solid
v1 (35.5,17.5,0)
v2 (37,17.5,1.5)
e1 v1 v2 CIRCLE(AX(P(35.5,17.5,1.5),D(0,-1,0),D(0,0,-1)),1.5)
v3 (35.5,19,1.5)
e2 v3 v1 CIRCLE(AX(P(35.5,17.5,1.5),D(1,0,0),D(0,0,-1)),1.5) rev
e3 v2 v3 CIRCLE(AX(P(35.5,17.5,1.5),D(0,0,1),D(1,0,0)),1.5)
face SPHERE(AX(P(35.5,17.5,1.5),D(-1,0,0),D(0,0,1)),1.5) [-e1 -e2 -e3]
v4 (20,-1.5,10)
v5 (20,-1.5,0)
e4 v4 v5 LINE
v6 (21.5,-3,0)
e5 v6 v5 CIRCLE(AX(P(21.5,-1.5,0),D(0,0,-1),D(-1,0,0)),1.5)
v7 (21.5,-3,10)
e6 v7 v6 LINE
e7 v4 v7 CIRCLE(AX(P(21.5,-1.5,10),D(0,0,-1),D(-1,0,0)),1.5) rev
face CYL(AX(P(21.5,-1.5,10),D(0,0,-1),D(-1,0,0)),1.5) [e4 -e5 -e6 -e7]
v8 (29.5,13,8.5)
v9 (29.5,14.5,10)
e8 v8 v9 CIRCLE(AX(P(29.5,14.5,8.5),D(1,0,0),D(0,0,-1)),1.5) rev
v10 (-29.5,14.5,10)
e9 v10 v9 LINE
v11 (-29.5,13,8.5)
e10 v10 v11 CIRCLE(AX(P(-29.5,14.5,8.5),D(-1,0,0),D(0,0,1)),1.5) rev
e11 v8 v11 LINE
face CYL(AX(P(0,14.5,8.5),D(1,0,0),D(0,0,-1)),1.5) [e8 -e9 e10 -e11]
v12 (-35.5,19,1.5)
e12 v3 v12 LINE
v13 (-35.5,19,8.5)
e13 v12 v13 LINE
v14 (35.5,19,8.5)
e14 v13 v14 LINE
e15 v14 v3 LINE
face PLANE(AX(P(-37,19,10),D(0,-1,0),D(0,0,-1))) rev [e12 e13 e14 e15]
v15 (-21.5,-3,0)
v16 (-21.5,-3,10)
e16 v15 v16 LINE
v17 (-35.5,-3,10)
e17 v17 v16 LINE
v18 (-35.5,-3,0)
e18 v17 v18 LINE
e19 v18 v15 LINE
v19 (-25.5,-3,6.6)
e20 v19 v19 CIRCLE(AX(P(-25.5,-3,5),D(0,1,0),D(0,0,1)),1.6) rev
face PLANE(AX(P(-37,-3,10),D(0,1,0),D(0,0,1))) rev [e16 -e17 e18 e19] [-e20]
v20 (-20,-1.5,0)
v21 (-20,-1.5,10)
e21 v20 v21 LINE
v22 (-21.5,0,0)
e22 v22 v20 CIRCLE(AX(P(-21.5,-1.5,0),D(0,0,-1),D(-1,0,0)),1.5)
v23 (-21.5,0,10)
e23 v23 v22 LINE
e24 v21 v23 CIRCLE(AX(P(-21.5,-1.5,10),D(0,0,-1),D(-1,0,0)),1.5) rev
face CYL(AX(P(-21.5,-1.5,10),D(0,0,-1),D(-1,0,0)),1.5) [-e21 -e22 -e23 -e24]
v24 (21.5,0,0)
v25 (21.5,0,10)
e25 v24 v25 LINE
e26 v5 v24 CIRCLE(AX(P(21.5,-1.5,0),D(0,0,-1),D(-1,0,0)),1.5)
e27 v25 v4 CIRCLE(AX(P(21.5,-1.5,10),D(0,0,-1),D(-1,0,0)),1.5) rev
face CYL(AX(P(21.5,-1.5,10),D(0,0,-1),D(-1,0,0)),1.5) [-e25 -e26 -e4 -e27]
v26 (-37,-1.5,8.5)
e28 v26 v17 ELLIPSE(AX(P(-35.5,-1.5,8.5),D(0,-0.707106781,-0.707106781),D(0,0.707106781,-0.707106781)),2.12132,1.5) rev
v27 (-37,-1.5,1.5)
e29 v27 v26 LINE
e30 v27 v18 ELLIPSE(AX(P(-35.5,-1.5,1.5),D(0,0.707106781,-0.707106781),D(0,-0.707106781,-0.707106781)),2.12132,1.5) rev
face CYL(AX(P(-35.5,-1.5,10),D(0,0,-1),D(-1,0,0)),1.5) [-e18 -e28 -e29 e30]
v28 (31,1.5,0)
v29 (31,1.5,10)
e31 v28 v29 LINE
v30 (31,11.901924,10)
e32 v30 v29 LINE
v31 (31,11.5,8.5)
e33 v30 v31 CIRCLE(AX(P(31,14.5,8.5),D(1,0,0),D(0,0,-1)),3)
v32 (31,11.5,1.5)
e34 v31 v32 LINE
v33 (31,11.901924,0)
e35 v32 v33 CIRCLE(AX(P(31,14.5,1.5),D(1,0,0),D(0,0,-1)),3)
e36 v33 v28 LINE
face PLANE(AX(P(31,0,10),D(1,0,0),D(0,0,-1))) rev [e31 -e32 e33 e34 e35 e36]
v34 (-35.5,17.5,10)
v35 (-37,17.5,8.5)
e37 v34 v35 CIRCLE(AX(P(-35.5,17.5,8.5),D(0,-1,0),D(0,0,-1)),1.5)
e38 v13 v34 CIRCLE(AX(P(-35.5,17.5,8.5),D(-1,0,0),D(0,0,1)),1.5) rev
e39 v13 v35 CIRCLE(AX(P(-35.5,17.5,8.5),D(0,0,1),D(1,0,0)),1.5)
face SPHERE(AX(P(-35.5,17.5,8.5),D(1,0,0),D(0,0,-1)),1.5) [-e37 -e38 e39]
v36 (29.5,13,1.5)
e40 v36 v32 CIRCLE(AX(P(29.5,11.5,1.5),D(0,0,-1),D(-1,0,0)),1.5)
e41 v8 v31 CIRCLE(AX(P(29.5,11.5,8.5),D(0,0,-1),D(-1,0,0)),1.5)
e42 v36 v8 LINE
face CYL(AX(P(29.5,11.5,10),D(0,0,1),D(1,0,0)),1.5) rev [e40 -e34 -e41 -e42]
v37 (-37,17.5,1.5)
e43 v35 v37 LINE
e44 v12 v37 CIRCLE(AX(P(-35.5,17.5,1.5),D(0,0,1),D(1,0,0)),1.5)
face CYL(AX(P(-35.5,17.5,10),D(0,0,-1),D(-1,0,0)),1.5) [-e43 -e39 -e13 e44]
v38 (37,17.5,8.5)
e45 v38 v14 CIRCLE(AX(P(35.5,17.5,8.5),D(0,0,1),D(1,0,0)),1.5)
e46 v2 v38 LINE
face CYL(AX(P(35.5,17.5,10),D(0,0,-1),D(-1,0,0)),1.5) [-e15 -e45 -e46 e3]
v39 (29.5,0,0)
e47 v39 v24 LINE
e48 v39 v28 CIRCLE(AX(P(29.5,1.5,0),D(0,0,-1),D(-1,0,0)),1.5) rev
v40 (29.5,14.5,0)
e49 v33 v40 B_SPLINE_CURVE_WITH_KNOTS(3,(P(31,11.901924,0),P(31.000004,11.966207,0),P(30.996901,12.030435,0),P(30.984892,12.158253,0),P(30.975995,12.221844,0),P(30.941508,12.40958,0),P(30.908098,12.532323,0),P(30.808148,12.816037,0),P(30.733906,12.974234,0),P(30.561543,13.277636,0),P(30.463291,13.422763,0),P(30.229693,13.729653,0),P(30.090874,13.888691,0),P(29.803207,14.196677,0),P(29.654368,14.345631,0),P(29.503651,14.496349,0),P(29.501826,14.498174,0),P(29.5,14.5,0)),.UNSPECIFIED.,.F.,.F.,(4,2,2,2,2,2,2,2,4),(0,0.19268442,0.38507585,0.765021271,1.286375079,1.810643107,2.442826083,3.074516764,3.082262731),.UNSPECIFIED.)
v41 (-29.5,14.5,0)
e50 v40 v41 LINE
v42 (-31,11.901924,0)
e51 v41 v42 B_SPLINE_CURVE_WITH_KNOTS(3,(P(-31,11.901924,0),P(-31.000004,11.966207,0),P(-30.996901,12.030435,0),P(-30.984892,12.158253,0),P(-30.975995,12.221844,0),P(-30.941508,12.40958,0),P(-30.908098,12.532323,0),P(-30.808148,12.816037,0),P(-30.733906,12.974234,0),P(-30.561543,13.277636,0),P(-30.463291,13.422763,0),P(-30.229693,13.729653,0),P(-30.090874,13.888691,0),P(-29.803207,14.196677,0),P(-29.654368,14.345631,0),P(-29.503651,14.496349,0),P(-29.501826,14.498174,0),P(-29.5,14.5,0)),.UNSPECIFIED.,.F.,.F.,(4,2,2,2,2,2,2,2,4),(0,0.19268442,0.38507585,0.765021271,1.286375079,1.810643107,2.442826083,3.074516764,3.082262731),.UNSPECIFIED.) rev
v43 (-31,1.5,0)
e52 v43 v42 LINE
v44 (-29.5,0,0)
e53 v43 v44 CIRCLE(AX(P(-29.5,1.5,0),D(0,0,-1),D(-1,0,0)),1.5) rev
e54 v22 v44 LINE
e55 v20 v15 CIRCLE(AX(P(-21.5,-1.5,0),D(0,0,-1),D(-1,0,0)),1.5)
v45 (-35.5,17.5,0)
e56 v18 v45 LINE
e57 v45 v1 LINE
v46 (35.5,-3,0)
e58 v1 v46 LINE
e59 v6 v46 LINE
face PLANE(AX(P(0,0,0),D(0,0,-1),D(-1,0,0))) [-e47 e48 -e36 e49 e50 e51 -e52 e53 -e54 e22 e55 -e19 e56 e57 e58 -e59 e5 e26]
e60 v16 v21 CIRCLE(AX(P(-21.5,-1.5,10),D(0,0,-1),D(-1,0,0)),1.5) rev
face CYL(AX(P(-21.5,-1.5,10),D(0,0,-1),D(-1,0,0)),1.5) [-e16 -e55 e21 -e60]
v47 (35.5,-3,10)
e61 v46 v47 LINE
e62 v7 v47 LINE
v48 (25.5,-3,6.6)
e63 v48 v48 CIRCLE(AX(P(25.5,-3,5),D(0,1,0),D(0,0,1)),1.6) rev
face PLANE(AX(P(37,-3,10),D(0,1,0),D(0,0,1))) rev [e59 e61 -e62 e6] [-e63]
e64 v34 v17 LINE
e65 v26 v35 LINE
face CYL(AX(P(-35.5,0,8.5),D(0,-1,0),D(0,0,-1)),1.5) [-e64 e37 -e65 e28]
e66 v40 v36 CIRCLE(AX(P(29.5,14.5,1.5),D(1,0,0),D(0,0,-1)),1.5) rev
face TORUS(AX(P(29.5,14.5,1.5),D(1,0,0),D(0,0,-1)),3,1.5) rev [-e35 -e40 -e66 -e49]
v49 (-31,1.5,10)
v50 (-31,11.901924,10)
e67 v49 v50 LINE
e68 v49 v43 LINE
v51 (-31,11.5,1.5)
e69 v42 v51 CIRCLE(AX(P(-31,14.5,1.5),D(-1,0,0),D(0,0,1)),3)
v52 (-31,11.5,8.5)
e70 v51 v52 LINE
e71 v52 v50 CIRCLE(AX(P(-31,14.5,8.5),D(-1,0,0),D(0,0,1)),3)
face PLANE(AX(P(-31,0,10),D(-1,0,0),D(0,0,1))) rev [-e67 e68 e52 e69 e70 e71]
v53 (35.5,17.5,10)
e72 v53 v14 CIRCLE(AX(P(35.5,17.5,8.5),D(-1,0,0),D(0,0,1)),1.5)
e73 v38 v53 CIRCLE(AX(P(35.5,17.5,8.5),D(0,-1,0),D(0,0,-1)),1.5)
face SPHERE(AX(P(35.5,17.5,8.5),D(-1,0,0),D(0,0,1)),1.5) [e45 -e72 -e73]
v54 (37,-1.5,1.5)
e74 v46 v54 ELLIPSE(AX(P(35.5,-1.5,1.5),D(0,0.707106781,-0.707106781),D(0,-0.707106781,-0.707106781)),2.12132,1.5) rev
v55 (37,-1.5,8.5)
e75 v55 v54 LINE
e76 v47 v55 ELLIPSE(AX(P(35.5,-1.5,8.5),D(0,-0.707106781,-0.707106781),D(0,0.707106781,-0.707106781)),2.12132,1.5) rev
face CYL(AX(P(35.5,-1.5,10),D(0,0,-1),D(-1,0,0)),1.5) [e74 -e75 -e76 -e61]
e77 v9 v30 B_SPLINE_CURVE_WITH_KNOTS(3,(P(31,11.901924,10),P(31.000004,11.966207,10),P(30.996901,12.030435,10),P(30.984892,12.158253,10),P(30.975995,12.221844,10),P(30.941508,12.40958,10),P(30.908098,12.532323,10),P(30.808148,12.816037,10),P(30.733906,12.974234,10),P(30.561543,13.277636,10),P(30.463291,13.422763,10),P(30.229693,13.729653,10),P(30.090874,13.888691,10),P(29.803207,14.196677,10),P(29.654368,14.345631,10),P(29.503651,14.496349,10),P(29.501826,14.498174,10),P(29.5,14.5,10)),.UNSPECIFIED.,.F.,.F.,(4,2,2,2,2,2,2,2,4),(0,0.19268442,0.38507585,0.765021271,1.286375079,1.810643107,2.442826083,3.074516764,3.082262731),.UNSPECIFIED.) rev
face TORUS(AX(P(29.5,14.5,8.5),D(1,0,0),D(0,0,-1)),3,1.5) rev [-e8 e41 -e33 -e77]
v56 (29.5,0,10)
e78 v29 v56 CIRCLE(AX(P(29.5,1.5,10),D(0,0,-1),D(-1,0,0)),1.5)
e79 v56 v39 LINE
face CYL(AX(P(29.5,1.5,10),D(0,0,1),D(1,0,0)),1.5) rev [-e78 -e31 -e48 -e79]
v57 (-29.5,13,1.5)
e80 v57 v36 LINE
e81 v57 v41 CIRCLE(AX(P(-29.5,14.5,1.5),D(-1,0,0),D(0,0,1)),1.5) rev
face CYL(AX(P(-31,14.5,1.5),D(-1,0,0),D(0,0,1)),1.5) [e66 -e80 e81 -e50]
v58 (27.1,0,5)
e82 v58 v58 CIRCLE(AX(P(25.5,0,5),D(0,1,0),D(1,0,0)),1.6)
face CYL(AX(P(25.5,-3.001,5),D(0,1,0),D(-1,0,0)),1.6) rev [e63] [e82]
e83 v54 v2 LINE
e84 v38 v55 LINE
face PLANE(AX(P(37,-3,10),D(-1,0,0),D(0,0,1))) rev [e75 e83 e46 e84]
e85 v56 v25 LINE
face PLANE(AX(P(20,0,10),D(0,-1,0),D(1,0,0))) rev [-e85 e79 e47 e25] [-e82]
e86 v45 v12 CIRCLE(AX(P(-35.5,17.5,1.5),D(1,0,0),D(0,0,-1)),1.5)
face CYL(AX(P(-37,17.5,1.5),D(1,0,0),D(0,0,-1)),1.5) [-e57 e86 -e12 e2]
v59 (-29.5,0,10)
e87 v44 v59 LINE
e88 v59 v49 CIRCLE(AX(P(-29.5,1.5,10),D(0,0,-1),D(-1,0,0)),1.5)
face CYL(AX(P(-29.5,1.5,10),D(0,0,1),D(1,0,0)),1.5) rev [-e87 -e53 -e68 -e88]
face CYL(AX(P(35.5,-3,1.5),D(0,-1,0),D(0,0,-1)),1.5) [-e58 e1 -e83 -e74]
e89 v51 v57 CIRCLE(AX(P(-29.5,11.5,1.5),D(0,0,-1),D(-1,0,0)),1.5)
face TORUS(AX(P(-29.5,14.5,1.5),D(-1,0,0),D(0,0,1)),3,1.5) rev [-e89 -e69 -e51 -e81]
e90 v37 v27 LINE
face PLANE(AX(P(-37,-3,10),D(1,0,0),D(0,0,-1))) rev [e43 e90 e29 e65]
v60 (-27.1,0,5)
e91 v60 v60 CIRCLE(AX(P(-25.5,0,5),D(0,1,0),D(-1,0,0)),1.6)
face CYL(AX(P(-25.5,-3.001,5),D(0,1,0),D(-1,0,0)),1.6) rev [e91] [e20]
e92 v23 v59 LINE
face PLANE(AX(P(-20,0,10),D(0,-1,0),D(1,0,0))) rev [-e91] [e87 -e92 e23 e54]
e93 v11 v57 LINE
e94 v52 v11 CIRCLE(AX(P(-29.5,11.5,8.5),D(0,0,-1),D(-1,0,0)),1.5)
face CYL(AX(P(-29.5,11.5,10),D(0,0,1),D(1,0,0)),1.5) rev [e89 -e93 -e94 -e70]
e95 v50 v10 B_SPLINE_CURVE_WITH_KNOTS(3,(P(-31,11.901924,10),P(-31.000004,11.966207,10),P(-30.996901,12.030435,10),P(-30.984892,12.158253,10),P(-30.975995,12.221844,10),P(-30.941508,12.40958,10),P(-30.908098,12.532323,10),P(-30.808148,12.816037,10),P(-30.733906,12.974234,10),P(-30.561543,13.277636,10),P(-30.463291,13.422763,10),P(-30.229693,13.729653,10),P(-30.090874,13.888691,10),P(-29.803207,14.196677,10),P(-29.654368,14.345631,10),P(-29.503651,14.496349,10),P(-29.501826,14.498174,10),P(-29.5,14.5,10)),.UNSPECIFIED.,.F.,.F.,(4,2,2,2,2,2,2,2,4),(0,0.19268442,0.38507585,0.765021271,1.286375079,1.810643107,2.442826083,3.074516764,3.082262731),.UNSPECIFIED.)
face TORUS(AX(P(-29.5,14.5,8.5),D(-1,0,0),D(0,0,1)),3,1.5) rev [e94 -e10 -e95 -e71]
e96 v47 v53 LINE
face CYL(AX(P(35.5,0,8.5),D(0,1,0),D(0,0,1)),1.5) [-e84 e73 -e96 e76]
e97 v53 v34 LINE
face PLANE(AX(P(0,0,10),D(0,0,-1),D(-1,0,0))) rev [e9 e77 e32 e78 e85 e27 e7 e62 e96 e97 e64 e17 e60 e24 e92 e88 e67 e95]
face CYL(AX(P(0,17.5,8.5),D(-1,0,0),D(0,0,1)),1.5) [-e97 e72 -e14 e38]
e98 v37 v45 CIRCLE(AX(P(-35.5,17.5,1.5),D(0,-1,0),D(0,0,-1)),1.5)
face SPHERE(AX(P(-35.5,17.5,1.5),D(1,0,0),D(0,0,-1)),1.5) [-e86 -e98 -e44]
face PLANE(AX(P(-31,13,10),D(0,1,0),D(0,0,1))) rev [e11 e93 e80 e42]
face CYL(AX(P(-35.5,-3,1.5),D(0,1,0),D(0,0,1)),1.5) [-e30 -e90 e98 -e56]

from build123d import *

# Parameters (mm, degrees)
RESSALTO_EXTRUS_O1_DEPTH = 10
CORTE_EXTRUS_O1_REACH    = 44.778
ESBO_O2_R                = 1.6
FILETE1_R                = 1.5
FILETE2_R                = 1.5
FILETE3_R                = 1.5


# Some blends are built 0.0001 mm under size
with BuildPart() as part:
    # Esboço1 → Ressalto-extrusão1 (new body)
    with BuildSketch(Plane.XY):
        Polygon((-37, -3), (-20, -3), (-20, 0), (-31, 0), (-31, 13), (31, 13), (31, 0), (20, 0), (20, -3), (37, -3), (37, 19), (-37, 19), align=None)
    extrude(amount=RESSALTO_EXTRUS_O1_DEPTH)

    # Esboço2 → Corte-extrusão1 (cut, up to next)
    with BuildSketch(Plane(origin=(0, 0, 0), x_dir=(1, 0, 0), z_dir=(0, 1, 0)), mode=Mode.PRIVATE) as corte_extrus_o1_sk1:
        with Locations(Location((-25.5, -5, 0), (0, 0, 180))):
            Circle(ESBO_O2_R)
    corte_extrus_o1_tool1 = extrude(corte_extrus_o1_sk1.sketch, amount=-CORTE_EXTRUS_O1_REACH, mode=Mode.PRIVATE) & part.part
    # Esboço2 → Corte-extrusão1 (cut, up to next)
    with BuildSketch(Plane(origin=(0, 0, 0), x_dir=(1, 0, 0), z_dir=(0, 1, 0)), mode=Mode.PRIVATE) as corte_extrus_o1_sk2:
        with Locations(Location((25.5, -5, 0), (0, 0, 270))):
            Circle(ESBO_O2_R)
    corte_extrus_o1_tool2 = extrude(corte_extrus_o1_sk2.sketch, amount=-CORTE_EXTRUS_O1_REACH, mode=Mode.PRIVATE) & part.part
    add(corte_extrus_o1_tool1.solids().sort_by_distance((-25.5, 0, 5))[0], mode=Mode.SUBTRACT)
    add(corte_extrus_o1_tool2.solids().sort_by_distance((25.5, 0, 5))[0], mode=Mode.SUBTRACT)

    # Filete1
    filete1_edges = [part.edges().sort_by_distance(p)[0] for p in [
        (0, 19, 0),
        (0, 13, 0),
        (0, 13, 10),
        (0, 19, 10),
    ]]
    fillet(filete1_edges, radius=FILETE1_R)

    # Filete2
    filete2_edges = [part.edges().sort_by_distance(p)[0] for p in [
        (37, 7.25, 10),
        (37, 18.560660172, 9.560660172),
        (37, 7.25, 0),
        (37, 18.560660172, 0.439339828),
        (-37, 7.25, 10),
        (-37, 18.560660172, 9.560660172),
        (-37, 7.25, 0),
        (-37, 18.560660172, 0.439339828),
        (37, 19, 5),
        (-37, 19, 5),
        (-20, -3, 5),
        (20, -3, 5),
        (-20, 0, 5),
        (20, 0, 5),
        (31, 0, 5),
        (-31, 0, 5),
        (-37, -3, 5),
        (37, -3, 5),
    ]]
    fillet(filete2_edges, radius=FILETE2_R - 0.0001)  # a hair under: the kernel refuses the full size

    # Filete3
    # the kernel refuses this fillet: 1.5 mm, written as the material it adds along each edge
    with BuildSketch(Plane(origin=(31, 13, 1.5), x_dir=(0, -1, 0), z_dir=(0, 0, 1))) as filete3_piece_1:
        with BuildLine():
            CenterArc((FILETE3_R, -FILETE3_R), FILETE3_R, 90, 90)
            Line((0, -FILETE3_R), (0, 0))
            Line((0, 0), (FILETE3_R, 0))
        make_face()
    extrude(amount=7)
    with BuildSketch(Plane(origin=(-31, 13, 1.5), x_dir=(0, -1, 0), z_dir=(0, 0, 1))) as filete3_piece_2:
        with BuildLine():
            CenterArc((FILETE3_R, FILETE3_R), FILETE3_R, 180, 90)
            Line((0, FILETE3_R), (0, 0))
            Line((0, 0), (FILETE3_R, 0))
        make_face()
    extrude(amount=7)
    with BuildSketch(Plane(origin=(31, 14.5, 8.5), x_dir=(0, 0.5976672776328287, -0.8017442392976475), z_dir=(0, -0.8017442392976475, -0.5976672776328287))) as filete3_piece_3_section:
        with BuildLine():
            CenterArc((1.5 + FILETE3_R, -FILETE3_R), FILETE3_R, 90, 90)
            Line((1.5, -FILETE3_R), (1.5, 0))
            Line((1.5, 0), (1.5 + FILETE3_R, 0))
        make_face()
    filete3_piece_3 = revolve(axis=Axis((31, 14.5, 8.5), (1, 0, 0)), revolution_arc=233.296989237, mode=Mode.PRIVATE)
    filete3_piece_3 = split(filete3_piece_3, bisect_by=Plane(origin=(30.532557549, 13.375091575, 10), z_dir=(0, 0, -1)), keep=Keep.TOP, mode=Mode.PRIVATE)
    add(filete3_piece_3)
    with BuildSketch(Plane(origin=(-31, 14.5, 8.5), x_dir=(0, 0.5976672776328287, -0.8017442392976475), z_dir=(0, -0.8017442392976475, -0.5976672776328287))) as filete3_piece_4_section:
        with BuildLine():
            CenterArc((1.5 + FILETE3_R, FILETE3_R), FILETE3_R, 180, 90)
            Line((1.5, FILETE3_R), (1.5, 0))
            Line((1.5, 0), (1.5 + FILETE3_R, 0))
        make_face()
    filete3_piece_4 = revolve(axis=Axis((-31, 14.5, 8.5), (1, 0, 0)), revolution_arc=233.296989237, mode=Mode.PRIVATE)
    filete3_piece_4 = split(filete3_piece_4, bisect_by=Plane(origin=(-30.532557659, 13.37509149, 10), z_dir=(0, 0, -1)), keep=Keep.TOP, mode=Mode.PRIVATE)
    add(filete3_piece_4)
    with BuildSketch(Plane(origin=(31, 14.5, 1.5), x_dir=(0, 0.5976672776328277, 0.8017442392976482), z_dir=(0, -0.8017442392976482, 0.5976672776328277))) as filete3_piece_5_section:
        with BuildLine():
            CenterArc((1.5 + FILETE3_R, FILETE3_R), FILETE3_R, 180, 90)
            Line((1.5, FILETE3_R), (1.5, 0))
            Line((1.5, 0), (1.5 + FILETE3_R, 0))
        make_face()
    filete3_piece_5 = revolve(axis=Axis((31, 14.5, 1.5), (-1, 0, 0)), revolution_arc=233.296989237, mode=Mode.PRIVATE)
    filete3_piece_5 = split(filete3_piece_5, bisect_by=Plane(origin=(30.532557549, 13.375091575, 0), z_dir=(0, 0, 1)), keep=Keep.TOP, mode=Mode.PRIVATE)
    add(filete3_piece_5)
    with BuildSketch(Plane(origin=(-31, 14.5, 1.5), x_dir=(0, 0.5976672776328277, 0.8017442392976482), z_dir=(0, -0.8017442392976482, 0.5976672776328277))) as filete3_piece_6_section:
        with BuildLine():
            CenterArc((1.5 + FILETE3_R, -FILETE3_R), FILETE3_R, 90, 90)
            Line((1.5, -FILETE3_R), (1.5, 0))
            Line((1.5, 0), (1.5 + FILETE3_R, 0))
        make_face()
    filete3_piece_6 = revolve(axis=Axis((-31, 14.5, 1.5), (-1, 0, 0)), revolution_arc=233.296989237, mode=Mode.PRIVATE)
    filete3_piece_6 = split(filete3_piece_6, bisect_by=Plane(origin=(-30.532557571, 13.375091573, 0), z_dir=(0, 0, 1)), keep=Keep.TOP, mode=Mode.PRIVATE)
    add(filete3_piece_6)


solid = part.part
